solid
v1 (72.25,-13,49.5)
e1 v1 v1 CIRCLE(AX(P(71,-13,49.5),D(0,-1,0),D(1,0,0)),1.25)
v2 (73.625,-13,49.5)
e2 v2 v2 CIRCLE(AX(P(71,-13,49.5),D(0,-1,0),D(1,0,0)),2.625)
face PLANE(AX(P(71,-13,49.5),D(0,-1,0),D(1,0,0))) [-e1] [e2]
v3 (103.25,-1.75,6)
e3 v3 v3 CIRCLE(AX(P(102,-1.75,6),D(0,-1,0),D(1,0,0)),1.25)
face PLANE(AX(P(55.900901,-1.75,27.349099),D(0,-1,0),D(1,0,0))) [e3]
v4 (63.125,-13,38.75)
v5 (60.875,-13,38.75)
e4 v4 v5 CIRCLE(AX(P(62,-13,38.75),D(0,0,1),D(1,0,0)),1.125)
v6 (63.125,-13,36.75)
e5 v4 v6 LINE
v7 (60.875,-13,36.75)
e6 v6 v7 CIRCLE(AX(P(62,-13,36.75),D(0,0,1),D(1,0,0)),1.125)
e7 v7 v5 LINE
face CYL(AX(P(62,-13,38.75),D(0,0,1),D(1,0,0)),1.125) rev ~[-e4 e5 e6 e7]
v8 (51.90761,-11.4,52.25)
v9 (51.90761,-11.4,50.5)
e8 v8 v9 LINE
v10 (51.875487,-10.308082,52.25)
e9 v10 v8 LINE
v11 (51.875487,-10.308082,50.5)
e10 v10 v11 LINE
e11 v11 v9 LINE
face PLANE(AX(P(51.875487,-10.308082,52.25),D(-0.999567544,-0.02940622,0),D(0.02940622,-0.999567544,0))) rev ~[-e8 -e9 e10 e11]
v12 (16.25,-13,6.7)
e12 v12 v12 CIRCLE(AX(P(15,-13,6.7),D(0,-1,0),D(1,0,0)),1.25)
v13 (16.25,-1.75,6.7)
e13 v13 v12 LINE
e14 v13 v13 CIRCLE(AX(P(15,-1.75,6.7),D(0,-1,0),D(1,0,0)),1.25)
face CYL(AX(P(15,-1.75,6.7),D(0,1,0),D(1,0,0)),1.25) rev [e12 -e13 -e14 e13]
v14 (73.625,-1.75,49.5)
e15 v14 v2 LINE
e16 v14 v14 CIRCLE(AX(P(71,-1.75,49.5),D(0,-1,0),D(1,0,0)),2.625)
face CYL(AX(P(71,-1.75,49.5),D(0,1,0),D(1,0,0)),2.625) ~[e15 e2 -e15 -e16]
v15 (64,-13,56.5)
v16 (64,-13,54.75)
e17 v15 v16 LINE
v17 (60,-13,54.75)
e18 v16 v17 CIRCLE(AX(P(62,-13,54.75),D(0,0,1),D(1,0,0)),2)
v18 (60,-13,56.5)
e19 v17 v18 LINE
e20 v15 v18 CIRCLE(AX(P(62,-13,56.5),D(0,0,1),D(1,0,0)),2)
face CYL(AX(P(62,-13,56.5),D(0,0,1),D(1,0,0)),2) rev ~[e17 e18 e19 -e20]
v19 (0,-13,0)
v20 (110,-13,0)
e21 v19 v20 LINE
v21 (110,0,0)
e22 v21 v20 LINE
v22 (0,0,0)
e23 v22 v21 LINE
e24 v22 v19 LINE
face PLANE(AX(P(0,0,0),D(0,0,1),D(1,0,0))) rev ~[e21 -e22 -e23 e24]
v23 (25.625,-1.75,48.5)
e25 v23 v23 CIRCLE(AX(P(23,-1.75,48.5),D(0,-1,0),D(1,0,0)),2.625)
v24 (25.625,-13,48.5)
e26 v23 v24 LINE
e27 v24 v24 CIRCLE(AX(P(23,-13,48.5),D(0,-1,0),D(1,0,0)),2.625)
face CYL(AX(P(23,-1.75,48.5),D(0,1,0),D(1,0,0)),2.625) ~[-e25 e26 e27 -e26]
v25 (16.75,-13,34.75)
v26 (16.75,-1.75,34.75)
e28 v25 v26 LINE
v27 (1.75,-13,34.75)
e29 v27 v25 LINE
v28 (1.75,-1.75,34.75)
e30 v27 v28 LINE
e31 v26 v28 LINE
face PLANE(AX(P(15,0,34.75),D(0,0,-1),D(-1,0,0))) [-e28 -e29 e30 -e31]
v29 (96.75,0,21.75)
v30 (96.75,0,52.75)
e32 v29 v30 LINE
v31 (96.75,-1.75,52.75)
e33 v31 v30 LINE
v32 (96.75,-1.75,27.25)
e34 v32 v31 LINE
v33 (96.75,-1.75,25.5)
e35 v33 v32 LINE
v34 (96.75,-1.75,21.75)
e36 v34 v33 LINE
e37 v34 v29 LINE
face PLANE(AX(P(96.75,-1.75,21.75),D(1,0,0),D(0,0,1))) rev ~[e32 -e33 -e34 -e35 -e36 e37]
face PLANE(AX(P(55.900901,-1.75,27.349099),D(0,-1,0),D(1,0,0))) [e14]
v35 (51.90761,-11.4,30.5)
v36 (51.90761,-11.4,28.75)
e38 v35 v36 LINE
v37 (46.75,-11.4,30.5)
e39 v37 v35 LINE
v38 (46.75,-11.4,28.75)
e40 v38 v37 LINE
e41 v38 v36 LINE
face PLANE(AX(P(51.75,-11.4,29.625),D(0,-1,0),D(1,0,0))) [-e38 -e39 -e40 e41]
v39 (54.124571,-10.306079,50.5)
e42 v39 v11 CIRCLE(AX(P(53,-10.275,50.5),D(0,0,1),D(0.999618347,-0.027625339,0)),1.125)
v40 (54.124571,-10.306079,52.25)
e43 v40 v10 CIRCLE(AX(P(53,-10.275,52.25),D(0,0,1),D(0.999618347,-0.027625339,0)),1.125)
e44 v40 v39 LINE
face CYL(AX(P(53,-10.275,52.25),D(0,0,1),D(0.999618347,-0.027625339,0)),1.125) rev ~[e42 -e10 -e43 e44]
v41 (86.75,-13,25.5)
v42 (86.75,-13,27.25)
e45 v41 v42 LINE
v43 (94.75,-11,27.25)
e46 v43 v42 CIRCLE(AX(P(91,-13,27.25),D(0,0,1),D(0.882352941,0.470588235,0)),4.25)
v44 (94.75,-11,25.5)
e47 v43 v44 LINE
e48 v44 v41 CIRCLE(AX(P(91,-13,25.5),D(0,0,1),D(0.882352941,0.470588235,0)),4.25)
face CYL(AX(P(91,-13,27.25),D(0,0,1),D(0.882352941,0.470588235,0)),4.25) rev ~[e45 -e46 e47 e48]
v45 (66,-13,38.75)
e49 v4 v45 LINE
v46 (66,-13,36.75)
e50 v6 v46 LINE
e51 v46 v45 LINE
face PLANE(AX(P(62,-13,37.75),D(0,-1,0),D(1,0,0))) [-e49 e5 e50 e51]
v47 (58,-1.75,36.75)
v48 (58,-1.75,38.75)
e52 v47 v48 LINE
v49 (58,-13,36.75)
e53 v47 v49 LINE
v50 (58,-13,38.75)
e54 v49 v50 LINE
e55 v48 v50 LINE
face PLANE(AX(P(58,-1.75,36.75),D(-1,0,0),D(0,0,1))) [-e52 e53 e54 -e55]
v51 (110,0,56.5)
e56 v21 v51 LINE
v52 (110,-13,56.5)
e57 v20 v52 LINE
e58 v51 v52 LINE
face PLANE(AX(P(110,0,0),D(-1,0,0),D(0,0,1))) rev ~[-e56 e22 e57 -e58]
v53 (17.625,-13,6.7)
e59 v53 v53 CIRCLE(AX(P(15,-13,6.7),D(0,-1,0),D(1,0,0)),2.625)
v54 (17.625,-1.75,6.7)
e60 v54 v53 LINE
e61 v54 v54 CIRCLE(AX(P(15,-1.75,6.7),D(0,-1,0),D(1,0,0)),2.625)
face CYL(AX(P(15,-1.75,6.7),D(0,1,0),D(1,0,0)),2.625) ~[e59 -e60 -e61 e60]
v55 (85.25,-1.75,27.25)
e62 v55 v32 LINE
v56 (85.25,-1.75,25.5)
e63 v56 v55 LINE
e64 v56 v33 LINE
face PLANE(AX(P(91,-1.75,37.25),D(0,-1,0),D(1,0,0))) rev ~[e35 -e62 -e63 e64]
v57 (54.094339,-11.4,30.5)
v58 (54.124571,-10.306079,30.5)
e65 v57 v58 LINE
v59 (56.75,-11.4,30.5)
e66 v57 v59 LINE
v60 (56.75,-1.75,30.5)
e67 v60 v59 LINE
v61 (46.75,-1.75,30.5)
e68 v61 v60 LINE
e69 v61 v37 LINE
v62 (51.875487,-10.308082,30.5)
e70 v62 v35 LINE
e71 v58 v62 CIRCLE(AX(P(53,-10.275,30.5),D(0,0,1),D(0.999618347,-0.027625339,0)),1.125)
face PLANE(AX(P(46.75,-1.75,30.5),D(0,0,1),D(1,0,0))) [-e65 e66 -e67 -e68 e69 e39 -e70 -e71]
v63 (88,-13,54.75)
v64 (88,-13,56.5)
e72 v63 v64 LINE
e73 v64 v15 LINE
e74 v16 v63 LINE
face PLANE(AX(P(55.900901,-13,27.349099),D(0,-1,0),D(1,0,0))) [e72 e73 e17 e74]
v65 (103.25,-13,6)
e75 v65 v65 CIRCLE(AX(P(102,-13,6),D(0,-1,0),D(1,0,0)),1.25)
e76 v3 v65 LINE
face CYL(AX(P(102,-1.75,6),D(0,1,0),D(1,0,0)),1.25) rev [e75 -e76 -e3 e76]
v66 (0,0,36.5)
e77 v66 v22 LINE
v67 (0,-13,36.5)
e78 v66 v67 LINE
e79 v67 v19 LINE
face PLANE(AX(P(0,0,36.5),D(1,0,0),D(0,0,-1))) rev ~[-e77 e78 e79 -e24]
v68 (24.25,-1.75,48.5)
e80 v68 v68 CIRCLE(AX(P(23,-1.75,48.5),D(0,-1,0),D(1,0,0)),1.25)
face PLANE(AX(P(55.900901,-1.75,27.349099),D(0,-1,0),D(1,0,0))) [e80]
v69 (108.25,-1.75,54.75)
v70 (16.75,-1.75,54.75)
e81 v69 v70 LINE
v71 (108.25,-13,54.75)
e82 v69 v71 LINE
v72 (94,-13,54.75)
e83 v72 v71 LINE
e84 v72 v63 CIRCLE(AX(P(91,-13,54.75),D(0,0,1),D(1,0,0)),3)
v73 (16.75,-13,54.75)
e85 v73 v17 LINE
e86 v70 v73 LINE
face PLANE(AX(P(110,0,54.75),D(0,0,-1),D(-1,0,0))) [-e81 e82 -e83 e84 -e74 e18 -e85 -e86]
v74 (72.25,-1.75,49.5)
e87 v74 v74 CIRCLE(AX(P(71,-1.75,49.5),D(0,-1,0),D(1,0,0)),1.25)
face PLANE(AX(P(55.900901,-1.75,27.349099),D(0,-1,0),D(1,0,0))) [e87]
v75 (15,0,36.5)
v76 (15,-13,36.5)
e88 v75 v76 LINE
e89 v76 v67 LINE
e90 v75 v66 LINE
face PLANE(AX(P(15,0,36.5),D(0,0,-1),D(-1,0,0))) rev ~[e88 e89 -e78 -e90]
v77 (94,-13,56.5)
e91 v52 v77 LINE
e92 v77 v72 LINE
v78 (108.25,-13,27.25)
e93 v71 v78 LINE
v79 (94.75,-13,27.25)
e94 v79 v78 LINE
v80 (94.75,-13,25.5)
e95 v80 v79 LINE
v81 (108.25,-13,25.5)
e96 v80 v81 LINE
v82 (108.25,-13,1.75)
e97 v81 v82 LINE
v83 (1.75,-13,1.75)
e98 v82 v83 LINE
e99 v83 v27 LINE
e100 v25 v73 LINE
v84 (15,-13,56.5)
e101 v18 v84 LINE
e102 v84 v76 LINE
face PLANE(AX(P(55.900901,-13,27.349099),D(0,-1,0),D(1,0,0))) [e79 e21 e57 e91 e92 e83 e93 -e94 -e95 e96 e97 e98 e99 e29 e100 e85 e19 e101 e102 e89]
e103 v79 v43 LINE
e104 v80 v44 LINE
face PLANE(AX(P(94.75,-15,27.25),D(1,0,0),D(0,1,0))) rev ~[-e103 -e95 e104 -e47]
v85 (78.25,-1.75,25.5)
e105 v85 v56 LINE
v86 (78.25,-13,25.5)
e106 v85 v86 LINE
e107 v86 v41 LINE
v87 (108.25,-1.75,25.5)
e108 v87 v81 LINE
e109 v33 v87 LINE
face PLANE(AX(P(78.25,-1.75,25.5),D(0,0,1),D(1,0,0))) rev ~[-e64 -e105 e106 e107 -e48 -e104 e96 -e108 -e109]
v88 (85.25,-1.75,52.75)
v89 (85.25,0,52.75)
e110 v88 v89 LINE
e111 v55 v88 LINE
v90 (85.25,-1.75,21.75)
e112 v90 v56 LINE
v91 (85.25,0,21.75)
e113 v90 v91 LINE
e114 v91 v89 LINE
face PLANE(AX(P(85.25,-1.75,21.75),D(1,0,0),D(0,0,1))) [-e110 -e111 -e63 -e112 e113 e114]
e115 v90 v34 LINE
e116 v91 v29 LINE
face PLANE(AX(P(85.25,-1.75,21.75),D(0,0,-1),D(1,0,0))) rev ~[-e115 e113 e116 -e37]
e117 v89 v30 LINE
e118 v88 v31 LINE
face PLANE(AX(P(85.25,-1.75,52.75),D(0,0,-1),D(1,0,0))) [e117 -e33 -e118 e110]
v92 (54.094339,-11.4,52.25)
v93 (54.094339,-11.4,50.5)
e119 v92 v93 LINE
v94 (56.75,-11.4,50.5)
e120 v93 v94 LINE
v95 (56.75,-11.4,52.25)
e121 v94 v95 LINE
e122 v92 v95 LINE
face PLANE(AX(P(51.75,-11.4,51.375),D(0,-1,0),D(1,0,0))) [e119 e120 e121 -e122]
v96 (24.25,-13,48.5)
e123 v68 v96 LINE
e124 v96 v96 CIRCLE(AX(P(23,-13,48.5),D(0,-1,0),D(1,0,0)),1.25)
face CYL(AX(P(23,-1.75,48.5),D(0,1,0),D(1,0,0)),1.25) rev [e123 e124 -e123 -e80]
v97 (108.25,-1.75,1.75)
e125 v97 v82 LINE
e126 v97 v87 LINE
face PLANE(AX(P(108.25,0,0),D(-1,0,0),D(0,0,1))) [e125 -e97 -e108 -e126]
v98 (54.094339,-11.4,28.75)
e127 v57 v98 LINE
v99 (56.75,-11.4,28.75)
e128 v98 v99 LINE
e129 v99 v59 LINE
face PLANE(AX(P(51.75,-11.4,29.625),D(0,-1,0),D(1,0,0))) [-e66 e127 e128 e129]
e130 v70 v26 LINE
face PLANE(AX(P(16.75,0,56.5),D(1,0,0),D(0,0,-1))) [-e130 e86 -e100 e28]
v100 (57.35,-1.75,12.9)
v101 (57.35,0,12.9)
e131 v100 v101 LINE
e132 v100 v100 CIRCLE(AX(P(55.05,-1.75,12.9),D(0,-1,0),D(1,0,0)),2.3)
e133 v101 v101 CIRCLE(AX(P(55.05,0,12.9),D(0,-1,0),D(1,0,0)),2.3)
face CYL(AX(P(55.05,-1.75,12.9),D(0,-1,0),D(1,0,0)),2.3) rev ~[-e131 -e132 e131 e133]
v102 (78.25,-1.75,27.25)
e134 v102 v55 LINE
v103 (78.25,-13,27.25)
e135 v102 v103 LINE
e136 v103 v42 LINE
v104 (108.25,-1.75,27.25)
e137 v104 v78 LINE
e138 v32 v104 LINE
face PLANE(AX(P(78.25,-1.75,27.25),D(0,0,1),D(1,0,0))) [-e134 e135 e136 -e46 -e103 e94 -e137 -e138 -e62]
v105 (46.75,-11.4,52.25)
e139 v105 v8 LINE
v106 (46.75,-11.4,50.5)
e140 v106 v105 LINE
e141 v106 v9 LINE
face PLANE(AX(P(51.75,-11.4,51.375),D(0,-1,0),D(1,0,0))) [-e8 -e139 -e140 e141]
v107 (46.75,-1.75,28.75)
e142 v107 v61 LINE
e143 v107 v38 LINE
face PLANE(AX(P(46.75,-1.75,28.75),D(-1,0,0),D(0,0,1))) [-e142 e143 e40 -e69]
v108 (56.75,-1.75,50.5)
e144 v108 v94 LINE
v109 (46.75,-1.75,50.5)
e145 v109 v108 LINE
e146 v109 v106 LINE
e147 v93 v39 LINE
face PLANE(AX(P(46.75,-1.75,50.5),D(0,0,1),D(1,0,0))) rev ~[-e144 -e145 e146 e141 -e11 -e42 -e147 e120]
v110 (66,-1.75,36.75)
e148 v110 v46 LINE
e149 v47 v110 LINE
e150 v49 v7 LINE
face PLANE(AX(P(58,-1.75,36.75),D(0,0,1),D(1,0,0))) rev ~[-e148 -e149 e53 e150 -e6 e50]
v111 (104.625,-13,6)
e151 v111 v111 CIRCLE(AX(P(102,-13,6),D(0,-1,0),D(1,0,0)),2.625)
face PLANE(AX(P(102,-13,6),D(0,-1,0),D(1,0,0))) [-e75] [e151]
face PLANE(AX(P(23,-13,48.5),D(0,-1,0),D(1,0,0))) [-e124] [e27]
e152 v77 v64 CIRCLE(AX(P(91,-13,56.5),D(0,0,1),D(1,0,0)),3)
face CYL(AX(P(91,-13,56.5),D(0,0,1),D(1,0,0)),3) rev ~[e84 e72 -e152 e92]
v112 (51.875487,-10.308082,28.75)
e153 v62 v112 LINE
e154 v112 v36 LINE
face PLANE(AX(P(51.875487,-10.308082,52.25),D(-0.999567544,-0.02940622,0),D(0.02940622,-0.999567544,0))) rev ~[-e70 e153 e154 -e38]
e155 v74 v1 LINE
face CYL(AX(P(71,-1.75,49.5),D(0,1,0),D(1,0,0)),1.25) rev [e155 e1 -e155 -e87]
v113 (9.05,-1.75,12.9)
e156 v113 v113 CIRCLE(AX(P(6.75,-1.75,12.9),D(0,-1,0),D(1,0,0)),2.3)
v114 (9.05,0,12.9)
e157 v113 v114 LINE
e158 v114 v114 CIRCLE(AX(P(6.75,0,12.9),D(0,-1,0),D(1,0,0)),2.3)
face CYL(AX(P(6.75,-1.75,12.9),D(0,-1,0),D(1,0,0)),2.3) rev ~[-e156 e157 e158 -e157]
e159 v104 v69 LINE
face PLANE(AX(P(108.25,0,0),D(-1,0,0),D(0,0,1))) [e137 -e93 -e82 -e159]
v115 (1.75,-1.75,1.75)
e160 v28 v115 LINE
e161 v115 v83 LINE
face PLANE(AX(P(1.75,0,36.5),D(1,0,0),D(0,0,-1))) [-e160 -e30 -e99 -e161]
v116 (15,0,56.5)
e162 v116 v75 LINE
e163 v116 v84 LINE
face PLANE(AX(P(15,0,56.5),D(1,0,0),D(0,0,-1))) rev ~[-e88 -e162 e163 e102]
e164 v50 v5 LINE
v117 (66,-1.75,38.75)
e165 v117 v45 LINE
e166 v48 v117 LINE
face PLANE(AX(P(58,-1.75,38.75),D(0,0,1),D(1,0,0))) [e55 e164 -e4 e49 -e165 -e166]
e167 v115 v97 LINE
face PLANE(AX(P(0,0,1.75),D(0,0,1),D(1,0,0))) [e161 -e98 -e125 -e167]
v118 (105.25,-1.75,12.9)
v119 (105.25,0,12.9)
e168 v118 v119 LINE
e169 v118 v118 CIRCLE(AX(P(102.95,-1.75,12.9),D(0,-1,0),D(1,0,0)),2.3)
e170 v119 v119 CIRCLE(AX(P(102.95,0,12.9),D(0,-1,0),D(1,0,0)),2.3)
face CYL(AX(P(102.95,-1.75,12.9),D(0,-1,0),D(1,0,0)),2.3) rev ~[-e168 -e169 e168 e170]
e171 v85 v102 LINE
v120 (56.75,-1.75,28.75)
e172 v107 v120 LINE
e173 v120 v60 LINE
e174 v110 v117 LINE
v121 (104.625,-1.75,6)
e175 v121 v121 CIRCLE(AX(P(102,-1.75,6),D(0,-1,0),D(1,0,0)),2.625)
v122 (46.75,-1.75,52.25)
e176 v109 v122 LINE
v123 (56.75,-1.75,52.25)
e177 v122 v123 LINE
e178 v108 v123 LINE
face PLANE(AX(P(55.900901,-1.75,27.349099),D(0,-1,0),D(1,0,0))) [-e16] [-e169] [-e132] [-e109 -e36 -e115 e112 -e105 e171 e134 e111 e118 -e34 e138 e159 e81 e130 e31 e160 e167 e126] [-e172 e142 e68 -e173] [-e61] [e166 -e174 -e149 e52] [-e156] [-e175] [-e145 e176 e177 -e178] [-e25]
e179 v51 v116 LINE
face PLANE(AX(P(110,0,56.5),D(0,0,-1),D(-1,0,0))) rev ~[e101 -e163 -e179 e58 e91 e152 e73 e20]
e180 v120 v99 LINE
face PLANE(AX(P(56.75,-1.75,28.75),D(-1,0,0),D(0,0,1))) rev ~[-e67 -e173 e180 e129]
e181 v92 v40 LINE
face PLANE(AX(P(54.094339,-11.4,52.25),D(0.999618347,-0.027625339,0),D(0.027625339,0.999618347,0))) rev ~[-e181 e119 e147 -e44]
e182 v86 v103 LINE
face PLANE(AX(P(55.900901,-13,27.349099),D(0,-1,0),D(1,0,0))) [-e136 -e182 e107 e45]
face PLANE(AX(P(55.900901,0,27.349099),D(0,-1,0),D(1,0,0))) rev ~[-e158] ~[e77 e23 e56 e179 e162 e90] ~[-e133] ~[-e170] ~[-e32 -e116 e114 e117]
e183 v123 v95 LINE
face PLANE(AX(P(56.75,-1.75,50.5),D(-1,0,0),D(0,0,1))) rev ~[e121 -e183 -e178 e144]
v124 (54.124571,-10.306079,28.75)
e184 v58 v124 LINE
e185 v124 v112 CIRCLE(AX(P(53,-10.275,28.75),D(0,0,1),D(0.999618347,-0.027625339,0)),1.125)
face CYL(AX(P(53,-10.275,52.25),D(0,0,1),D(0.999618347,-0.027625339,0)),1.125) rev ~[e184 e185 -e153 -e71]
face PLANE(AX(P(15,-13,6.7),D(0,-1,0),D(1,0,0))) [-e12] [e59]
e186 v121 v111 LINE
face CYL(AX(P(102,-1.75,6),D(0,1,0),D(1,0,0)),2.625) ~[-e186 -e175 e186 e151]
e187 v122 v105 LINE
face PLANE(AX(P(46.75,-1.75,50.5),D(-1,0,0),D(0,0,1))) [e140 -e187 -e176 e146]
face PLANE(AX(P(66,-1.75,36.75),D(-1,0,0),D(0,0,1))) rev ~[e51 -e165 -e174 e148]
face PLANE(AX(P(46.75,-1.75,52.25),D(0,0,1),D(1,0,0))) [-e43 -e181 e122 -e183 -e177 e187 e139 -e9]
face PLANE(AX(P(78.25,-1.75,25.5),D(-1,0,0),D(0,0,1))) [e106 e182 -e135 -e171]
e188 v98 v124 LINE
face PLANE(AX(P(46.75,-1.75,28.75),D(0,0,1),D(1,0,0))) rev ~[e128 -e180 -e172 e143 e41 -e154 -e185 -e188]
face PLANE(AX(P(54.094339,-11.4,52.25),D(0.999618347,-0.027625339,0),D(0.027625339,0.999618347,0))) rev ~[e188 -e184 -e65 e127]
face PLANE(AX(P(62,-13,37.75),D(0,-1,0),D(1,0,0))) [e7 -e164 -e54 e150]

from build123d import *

# Parameters (mm, degrees)
F1_DEPTH  = 13
F2_T      = -1.75
F3_R      = 2.625
F3_R_2    = 1.25
F3_W      = 30
F3_H      = 1.75
F3_W_2    = 8
F3_H_2    = 2
F4_DEPTH  = 11.25
F5_R      = 3
F5_R_2    = 2
F6_DEPTH  = 2
F7_R      = 1.125
F8_DEPTH  = 2
F10_DEPTH = 2
F11_W     = 10
F11_H     = 1.75
F12_DEPTH = 11.25
F13_W     = 10
F13_H     = 1.75
F14_DEPTH = 1.6
F16_DEPTH = 25
F17_W     = 11.5
F17_H     = 31
F18_DEPTH = 1.751
F19_R     = 2.3
F20_DEPTH = 1.751


with BuildPart() as f1:
    # F0 (on Front) → F1 (new body)
    with BuildSketch(Plane.XZ):
        Polygon((0, 36.5), (0, 0), (110, 0), (110, 56.5), (15, 56.5), (15, 36.5), align=None)
    extrude(amount=F1_DEPTH)

    # F2
    f2_openings = [f1.faces().sort_by_distance(p)[0] for p in [
        (57.409129, -13, 27.324387),
    ]]
    offset(amount=F2_T, openings=f2_openings, kind=Kind.INTERSECTION)

    # F3 (on face) → F4 (join, through all)
    with BuildSketch(Plane.XZ.offset(1.75)):
        with Locations((23, 48.5)):
            Circle(F3_R)
        with Locations((23, 48.5)):
            Circle(F3_R_2, mode=Mode.SUBTRACT)
        with Locations((15, 6.7)):
            Circle(F3_R)
        with Locations((15, 6.7)):
            Circle(F3_R_2, mode=Mode.SUBTRACT)
        with Locations((71, 49.5)):
            Circle(F3_R)
        with Locations((71, 49.5)):
            Circle(F3_R_2, mode=Mode.SUBTRACT)
        with Locations((102, 6)):
            Circle(F3_R)
        with Locations((102, 6)):
            Circle(F3_R_2, mode=Mode.SUBTRACT)
        with Locations((93.25, 26.375)):
            Rectangle(F3_W, F3_H)
        with Locations((62, 37.75)):
            Rectangle(F3_W_2, F3_H_2)
    extrude(amount=F4_DEPTH)

    # F5 (on face) → F6 (cut)
    with BuildSketch(Plane.XY.offset(56.5)):
        with Locations((91, -13)):
            Circle(F5_R)
        with Locations((62, -13)):
            Circle(F5_R_2)
    extrude(amount=-F6_DEPTH, mode=Mode.SUBTRACT)

    # F7 (on face) → F8 (cut)
    with BuildSketch(Plane.XY.offset(38.75)):
        with Locations((62, -13)):
            Circle(F7_R)
    extrude(amount=-F8_DEPTH, mode=Mode.SUBTRACT)

    # F9 (on face) → F10 (cut)
    with BuildSketch(Plane.XY.offset(27.25)):
        with BuildLine():
            Line((94.75, -15), (94.75, -11))
            ThreePointArc((94.75, -11), (86.75, -13), (94.75, -15))
        make_face()
    extrude(amount=-F10_DEPTH, mode=Mode.SUBTRACT)

    # F11 (on face) → F12 (join, through all)
    with BuildSketch(Plane.XZ.offset(1.75)):
        with Locations((51.75, 51.375)):
            Rectangle(F11_W, F11_H)
        with Locations((51.75, 29.625)):
            Rectangle(F11_W, F11_H)
    extrude(amount=F12_DEPTH)

    # F13 (on face) → F14 (cut)
    with BuildSketch(Plane.XZ.offset(13)):
        with Locations((51.75, 51.375)):
            Rectangle(F13_W, F13_H)
        with Locations((51.75, 29.625)):
            Rectangle(F13_W, F13_H)
    extrude(amount=-F14_DEPTH, mode=Mode.SUBTRACT)

    # F15 (on face) → F16 (cut)
    with BuildSketch(Plane.XY.offset(52.25)):
        with BuildLine():
            Line((54.094339151, -11.4), (54.1245706409, -10.3060785062))
            ThreePointArc((54.1245706409, -10.3060785062), (52.9989978467, -9.1500004463), (51.8754865135, -10.3080819977))
            Line((51.8754865135, -10.3080819977), (51.9076095865, -11.4))
            Line((51.9076095865, -11.4), (54.094339151, -11.4))
        make_face()
    extrude(amount=-F16_DEPTH, mode=Mode.SUBTRACT)

    # F17 (on face) → F18 (cut, through all)
    with BuildSketch(Plane.XZ.offset(1.75)):
        with Locations((91, 37.25)):
            Rectangle(F17_W, F17_H)
    extrude(amount=-F18_DEPTH, mode=Mode.SUBTRACT)

    # F19 (on face) → F20 (cut, through all)
    with BuildSketch(Plane.XZ.offset(1.75)):
        with Locations((6.75, 12.9)):
            Circle(F19_R)
        with Locations((55.05, 12.9)):
            Circle(F19_R)
        with Locations((102.95, 12.9)):
            Circle(F19_R)
    extrude(amount=-F20_DEPTH, mode=Mode.SUBTRACT)


solid = f1.part
